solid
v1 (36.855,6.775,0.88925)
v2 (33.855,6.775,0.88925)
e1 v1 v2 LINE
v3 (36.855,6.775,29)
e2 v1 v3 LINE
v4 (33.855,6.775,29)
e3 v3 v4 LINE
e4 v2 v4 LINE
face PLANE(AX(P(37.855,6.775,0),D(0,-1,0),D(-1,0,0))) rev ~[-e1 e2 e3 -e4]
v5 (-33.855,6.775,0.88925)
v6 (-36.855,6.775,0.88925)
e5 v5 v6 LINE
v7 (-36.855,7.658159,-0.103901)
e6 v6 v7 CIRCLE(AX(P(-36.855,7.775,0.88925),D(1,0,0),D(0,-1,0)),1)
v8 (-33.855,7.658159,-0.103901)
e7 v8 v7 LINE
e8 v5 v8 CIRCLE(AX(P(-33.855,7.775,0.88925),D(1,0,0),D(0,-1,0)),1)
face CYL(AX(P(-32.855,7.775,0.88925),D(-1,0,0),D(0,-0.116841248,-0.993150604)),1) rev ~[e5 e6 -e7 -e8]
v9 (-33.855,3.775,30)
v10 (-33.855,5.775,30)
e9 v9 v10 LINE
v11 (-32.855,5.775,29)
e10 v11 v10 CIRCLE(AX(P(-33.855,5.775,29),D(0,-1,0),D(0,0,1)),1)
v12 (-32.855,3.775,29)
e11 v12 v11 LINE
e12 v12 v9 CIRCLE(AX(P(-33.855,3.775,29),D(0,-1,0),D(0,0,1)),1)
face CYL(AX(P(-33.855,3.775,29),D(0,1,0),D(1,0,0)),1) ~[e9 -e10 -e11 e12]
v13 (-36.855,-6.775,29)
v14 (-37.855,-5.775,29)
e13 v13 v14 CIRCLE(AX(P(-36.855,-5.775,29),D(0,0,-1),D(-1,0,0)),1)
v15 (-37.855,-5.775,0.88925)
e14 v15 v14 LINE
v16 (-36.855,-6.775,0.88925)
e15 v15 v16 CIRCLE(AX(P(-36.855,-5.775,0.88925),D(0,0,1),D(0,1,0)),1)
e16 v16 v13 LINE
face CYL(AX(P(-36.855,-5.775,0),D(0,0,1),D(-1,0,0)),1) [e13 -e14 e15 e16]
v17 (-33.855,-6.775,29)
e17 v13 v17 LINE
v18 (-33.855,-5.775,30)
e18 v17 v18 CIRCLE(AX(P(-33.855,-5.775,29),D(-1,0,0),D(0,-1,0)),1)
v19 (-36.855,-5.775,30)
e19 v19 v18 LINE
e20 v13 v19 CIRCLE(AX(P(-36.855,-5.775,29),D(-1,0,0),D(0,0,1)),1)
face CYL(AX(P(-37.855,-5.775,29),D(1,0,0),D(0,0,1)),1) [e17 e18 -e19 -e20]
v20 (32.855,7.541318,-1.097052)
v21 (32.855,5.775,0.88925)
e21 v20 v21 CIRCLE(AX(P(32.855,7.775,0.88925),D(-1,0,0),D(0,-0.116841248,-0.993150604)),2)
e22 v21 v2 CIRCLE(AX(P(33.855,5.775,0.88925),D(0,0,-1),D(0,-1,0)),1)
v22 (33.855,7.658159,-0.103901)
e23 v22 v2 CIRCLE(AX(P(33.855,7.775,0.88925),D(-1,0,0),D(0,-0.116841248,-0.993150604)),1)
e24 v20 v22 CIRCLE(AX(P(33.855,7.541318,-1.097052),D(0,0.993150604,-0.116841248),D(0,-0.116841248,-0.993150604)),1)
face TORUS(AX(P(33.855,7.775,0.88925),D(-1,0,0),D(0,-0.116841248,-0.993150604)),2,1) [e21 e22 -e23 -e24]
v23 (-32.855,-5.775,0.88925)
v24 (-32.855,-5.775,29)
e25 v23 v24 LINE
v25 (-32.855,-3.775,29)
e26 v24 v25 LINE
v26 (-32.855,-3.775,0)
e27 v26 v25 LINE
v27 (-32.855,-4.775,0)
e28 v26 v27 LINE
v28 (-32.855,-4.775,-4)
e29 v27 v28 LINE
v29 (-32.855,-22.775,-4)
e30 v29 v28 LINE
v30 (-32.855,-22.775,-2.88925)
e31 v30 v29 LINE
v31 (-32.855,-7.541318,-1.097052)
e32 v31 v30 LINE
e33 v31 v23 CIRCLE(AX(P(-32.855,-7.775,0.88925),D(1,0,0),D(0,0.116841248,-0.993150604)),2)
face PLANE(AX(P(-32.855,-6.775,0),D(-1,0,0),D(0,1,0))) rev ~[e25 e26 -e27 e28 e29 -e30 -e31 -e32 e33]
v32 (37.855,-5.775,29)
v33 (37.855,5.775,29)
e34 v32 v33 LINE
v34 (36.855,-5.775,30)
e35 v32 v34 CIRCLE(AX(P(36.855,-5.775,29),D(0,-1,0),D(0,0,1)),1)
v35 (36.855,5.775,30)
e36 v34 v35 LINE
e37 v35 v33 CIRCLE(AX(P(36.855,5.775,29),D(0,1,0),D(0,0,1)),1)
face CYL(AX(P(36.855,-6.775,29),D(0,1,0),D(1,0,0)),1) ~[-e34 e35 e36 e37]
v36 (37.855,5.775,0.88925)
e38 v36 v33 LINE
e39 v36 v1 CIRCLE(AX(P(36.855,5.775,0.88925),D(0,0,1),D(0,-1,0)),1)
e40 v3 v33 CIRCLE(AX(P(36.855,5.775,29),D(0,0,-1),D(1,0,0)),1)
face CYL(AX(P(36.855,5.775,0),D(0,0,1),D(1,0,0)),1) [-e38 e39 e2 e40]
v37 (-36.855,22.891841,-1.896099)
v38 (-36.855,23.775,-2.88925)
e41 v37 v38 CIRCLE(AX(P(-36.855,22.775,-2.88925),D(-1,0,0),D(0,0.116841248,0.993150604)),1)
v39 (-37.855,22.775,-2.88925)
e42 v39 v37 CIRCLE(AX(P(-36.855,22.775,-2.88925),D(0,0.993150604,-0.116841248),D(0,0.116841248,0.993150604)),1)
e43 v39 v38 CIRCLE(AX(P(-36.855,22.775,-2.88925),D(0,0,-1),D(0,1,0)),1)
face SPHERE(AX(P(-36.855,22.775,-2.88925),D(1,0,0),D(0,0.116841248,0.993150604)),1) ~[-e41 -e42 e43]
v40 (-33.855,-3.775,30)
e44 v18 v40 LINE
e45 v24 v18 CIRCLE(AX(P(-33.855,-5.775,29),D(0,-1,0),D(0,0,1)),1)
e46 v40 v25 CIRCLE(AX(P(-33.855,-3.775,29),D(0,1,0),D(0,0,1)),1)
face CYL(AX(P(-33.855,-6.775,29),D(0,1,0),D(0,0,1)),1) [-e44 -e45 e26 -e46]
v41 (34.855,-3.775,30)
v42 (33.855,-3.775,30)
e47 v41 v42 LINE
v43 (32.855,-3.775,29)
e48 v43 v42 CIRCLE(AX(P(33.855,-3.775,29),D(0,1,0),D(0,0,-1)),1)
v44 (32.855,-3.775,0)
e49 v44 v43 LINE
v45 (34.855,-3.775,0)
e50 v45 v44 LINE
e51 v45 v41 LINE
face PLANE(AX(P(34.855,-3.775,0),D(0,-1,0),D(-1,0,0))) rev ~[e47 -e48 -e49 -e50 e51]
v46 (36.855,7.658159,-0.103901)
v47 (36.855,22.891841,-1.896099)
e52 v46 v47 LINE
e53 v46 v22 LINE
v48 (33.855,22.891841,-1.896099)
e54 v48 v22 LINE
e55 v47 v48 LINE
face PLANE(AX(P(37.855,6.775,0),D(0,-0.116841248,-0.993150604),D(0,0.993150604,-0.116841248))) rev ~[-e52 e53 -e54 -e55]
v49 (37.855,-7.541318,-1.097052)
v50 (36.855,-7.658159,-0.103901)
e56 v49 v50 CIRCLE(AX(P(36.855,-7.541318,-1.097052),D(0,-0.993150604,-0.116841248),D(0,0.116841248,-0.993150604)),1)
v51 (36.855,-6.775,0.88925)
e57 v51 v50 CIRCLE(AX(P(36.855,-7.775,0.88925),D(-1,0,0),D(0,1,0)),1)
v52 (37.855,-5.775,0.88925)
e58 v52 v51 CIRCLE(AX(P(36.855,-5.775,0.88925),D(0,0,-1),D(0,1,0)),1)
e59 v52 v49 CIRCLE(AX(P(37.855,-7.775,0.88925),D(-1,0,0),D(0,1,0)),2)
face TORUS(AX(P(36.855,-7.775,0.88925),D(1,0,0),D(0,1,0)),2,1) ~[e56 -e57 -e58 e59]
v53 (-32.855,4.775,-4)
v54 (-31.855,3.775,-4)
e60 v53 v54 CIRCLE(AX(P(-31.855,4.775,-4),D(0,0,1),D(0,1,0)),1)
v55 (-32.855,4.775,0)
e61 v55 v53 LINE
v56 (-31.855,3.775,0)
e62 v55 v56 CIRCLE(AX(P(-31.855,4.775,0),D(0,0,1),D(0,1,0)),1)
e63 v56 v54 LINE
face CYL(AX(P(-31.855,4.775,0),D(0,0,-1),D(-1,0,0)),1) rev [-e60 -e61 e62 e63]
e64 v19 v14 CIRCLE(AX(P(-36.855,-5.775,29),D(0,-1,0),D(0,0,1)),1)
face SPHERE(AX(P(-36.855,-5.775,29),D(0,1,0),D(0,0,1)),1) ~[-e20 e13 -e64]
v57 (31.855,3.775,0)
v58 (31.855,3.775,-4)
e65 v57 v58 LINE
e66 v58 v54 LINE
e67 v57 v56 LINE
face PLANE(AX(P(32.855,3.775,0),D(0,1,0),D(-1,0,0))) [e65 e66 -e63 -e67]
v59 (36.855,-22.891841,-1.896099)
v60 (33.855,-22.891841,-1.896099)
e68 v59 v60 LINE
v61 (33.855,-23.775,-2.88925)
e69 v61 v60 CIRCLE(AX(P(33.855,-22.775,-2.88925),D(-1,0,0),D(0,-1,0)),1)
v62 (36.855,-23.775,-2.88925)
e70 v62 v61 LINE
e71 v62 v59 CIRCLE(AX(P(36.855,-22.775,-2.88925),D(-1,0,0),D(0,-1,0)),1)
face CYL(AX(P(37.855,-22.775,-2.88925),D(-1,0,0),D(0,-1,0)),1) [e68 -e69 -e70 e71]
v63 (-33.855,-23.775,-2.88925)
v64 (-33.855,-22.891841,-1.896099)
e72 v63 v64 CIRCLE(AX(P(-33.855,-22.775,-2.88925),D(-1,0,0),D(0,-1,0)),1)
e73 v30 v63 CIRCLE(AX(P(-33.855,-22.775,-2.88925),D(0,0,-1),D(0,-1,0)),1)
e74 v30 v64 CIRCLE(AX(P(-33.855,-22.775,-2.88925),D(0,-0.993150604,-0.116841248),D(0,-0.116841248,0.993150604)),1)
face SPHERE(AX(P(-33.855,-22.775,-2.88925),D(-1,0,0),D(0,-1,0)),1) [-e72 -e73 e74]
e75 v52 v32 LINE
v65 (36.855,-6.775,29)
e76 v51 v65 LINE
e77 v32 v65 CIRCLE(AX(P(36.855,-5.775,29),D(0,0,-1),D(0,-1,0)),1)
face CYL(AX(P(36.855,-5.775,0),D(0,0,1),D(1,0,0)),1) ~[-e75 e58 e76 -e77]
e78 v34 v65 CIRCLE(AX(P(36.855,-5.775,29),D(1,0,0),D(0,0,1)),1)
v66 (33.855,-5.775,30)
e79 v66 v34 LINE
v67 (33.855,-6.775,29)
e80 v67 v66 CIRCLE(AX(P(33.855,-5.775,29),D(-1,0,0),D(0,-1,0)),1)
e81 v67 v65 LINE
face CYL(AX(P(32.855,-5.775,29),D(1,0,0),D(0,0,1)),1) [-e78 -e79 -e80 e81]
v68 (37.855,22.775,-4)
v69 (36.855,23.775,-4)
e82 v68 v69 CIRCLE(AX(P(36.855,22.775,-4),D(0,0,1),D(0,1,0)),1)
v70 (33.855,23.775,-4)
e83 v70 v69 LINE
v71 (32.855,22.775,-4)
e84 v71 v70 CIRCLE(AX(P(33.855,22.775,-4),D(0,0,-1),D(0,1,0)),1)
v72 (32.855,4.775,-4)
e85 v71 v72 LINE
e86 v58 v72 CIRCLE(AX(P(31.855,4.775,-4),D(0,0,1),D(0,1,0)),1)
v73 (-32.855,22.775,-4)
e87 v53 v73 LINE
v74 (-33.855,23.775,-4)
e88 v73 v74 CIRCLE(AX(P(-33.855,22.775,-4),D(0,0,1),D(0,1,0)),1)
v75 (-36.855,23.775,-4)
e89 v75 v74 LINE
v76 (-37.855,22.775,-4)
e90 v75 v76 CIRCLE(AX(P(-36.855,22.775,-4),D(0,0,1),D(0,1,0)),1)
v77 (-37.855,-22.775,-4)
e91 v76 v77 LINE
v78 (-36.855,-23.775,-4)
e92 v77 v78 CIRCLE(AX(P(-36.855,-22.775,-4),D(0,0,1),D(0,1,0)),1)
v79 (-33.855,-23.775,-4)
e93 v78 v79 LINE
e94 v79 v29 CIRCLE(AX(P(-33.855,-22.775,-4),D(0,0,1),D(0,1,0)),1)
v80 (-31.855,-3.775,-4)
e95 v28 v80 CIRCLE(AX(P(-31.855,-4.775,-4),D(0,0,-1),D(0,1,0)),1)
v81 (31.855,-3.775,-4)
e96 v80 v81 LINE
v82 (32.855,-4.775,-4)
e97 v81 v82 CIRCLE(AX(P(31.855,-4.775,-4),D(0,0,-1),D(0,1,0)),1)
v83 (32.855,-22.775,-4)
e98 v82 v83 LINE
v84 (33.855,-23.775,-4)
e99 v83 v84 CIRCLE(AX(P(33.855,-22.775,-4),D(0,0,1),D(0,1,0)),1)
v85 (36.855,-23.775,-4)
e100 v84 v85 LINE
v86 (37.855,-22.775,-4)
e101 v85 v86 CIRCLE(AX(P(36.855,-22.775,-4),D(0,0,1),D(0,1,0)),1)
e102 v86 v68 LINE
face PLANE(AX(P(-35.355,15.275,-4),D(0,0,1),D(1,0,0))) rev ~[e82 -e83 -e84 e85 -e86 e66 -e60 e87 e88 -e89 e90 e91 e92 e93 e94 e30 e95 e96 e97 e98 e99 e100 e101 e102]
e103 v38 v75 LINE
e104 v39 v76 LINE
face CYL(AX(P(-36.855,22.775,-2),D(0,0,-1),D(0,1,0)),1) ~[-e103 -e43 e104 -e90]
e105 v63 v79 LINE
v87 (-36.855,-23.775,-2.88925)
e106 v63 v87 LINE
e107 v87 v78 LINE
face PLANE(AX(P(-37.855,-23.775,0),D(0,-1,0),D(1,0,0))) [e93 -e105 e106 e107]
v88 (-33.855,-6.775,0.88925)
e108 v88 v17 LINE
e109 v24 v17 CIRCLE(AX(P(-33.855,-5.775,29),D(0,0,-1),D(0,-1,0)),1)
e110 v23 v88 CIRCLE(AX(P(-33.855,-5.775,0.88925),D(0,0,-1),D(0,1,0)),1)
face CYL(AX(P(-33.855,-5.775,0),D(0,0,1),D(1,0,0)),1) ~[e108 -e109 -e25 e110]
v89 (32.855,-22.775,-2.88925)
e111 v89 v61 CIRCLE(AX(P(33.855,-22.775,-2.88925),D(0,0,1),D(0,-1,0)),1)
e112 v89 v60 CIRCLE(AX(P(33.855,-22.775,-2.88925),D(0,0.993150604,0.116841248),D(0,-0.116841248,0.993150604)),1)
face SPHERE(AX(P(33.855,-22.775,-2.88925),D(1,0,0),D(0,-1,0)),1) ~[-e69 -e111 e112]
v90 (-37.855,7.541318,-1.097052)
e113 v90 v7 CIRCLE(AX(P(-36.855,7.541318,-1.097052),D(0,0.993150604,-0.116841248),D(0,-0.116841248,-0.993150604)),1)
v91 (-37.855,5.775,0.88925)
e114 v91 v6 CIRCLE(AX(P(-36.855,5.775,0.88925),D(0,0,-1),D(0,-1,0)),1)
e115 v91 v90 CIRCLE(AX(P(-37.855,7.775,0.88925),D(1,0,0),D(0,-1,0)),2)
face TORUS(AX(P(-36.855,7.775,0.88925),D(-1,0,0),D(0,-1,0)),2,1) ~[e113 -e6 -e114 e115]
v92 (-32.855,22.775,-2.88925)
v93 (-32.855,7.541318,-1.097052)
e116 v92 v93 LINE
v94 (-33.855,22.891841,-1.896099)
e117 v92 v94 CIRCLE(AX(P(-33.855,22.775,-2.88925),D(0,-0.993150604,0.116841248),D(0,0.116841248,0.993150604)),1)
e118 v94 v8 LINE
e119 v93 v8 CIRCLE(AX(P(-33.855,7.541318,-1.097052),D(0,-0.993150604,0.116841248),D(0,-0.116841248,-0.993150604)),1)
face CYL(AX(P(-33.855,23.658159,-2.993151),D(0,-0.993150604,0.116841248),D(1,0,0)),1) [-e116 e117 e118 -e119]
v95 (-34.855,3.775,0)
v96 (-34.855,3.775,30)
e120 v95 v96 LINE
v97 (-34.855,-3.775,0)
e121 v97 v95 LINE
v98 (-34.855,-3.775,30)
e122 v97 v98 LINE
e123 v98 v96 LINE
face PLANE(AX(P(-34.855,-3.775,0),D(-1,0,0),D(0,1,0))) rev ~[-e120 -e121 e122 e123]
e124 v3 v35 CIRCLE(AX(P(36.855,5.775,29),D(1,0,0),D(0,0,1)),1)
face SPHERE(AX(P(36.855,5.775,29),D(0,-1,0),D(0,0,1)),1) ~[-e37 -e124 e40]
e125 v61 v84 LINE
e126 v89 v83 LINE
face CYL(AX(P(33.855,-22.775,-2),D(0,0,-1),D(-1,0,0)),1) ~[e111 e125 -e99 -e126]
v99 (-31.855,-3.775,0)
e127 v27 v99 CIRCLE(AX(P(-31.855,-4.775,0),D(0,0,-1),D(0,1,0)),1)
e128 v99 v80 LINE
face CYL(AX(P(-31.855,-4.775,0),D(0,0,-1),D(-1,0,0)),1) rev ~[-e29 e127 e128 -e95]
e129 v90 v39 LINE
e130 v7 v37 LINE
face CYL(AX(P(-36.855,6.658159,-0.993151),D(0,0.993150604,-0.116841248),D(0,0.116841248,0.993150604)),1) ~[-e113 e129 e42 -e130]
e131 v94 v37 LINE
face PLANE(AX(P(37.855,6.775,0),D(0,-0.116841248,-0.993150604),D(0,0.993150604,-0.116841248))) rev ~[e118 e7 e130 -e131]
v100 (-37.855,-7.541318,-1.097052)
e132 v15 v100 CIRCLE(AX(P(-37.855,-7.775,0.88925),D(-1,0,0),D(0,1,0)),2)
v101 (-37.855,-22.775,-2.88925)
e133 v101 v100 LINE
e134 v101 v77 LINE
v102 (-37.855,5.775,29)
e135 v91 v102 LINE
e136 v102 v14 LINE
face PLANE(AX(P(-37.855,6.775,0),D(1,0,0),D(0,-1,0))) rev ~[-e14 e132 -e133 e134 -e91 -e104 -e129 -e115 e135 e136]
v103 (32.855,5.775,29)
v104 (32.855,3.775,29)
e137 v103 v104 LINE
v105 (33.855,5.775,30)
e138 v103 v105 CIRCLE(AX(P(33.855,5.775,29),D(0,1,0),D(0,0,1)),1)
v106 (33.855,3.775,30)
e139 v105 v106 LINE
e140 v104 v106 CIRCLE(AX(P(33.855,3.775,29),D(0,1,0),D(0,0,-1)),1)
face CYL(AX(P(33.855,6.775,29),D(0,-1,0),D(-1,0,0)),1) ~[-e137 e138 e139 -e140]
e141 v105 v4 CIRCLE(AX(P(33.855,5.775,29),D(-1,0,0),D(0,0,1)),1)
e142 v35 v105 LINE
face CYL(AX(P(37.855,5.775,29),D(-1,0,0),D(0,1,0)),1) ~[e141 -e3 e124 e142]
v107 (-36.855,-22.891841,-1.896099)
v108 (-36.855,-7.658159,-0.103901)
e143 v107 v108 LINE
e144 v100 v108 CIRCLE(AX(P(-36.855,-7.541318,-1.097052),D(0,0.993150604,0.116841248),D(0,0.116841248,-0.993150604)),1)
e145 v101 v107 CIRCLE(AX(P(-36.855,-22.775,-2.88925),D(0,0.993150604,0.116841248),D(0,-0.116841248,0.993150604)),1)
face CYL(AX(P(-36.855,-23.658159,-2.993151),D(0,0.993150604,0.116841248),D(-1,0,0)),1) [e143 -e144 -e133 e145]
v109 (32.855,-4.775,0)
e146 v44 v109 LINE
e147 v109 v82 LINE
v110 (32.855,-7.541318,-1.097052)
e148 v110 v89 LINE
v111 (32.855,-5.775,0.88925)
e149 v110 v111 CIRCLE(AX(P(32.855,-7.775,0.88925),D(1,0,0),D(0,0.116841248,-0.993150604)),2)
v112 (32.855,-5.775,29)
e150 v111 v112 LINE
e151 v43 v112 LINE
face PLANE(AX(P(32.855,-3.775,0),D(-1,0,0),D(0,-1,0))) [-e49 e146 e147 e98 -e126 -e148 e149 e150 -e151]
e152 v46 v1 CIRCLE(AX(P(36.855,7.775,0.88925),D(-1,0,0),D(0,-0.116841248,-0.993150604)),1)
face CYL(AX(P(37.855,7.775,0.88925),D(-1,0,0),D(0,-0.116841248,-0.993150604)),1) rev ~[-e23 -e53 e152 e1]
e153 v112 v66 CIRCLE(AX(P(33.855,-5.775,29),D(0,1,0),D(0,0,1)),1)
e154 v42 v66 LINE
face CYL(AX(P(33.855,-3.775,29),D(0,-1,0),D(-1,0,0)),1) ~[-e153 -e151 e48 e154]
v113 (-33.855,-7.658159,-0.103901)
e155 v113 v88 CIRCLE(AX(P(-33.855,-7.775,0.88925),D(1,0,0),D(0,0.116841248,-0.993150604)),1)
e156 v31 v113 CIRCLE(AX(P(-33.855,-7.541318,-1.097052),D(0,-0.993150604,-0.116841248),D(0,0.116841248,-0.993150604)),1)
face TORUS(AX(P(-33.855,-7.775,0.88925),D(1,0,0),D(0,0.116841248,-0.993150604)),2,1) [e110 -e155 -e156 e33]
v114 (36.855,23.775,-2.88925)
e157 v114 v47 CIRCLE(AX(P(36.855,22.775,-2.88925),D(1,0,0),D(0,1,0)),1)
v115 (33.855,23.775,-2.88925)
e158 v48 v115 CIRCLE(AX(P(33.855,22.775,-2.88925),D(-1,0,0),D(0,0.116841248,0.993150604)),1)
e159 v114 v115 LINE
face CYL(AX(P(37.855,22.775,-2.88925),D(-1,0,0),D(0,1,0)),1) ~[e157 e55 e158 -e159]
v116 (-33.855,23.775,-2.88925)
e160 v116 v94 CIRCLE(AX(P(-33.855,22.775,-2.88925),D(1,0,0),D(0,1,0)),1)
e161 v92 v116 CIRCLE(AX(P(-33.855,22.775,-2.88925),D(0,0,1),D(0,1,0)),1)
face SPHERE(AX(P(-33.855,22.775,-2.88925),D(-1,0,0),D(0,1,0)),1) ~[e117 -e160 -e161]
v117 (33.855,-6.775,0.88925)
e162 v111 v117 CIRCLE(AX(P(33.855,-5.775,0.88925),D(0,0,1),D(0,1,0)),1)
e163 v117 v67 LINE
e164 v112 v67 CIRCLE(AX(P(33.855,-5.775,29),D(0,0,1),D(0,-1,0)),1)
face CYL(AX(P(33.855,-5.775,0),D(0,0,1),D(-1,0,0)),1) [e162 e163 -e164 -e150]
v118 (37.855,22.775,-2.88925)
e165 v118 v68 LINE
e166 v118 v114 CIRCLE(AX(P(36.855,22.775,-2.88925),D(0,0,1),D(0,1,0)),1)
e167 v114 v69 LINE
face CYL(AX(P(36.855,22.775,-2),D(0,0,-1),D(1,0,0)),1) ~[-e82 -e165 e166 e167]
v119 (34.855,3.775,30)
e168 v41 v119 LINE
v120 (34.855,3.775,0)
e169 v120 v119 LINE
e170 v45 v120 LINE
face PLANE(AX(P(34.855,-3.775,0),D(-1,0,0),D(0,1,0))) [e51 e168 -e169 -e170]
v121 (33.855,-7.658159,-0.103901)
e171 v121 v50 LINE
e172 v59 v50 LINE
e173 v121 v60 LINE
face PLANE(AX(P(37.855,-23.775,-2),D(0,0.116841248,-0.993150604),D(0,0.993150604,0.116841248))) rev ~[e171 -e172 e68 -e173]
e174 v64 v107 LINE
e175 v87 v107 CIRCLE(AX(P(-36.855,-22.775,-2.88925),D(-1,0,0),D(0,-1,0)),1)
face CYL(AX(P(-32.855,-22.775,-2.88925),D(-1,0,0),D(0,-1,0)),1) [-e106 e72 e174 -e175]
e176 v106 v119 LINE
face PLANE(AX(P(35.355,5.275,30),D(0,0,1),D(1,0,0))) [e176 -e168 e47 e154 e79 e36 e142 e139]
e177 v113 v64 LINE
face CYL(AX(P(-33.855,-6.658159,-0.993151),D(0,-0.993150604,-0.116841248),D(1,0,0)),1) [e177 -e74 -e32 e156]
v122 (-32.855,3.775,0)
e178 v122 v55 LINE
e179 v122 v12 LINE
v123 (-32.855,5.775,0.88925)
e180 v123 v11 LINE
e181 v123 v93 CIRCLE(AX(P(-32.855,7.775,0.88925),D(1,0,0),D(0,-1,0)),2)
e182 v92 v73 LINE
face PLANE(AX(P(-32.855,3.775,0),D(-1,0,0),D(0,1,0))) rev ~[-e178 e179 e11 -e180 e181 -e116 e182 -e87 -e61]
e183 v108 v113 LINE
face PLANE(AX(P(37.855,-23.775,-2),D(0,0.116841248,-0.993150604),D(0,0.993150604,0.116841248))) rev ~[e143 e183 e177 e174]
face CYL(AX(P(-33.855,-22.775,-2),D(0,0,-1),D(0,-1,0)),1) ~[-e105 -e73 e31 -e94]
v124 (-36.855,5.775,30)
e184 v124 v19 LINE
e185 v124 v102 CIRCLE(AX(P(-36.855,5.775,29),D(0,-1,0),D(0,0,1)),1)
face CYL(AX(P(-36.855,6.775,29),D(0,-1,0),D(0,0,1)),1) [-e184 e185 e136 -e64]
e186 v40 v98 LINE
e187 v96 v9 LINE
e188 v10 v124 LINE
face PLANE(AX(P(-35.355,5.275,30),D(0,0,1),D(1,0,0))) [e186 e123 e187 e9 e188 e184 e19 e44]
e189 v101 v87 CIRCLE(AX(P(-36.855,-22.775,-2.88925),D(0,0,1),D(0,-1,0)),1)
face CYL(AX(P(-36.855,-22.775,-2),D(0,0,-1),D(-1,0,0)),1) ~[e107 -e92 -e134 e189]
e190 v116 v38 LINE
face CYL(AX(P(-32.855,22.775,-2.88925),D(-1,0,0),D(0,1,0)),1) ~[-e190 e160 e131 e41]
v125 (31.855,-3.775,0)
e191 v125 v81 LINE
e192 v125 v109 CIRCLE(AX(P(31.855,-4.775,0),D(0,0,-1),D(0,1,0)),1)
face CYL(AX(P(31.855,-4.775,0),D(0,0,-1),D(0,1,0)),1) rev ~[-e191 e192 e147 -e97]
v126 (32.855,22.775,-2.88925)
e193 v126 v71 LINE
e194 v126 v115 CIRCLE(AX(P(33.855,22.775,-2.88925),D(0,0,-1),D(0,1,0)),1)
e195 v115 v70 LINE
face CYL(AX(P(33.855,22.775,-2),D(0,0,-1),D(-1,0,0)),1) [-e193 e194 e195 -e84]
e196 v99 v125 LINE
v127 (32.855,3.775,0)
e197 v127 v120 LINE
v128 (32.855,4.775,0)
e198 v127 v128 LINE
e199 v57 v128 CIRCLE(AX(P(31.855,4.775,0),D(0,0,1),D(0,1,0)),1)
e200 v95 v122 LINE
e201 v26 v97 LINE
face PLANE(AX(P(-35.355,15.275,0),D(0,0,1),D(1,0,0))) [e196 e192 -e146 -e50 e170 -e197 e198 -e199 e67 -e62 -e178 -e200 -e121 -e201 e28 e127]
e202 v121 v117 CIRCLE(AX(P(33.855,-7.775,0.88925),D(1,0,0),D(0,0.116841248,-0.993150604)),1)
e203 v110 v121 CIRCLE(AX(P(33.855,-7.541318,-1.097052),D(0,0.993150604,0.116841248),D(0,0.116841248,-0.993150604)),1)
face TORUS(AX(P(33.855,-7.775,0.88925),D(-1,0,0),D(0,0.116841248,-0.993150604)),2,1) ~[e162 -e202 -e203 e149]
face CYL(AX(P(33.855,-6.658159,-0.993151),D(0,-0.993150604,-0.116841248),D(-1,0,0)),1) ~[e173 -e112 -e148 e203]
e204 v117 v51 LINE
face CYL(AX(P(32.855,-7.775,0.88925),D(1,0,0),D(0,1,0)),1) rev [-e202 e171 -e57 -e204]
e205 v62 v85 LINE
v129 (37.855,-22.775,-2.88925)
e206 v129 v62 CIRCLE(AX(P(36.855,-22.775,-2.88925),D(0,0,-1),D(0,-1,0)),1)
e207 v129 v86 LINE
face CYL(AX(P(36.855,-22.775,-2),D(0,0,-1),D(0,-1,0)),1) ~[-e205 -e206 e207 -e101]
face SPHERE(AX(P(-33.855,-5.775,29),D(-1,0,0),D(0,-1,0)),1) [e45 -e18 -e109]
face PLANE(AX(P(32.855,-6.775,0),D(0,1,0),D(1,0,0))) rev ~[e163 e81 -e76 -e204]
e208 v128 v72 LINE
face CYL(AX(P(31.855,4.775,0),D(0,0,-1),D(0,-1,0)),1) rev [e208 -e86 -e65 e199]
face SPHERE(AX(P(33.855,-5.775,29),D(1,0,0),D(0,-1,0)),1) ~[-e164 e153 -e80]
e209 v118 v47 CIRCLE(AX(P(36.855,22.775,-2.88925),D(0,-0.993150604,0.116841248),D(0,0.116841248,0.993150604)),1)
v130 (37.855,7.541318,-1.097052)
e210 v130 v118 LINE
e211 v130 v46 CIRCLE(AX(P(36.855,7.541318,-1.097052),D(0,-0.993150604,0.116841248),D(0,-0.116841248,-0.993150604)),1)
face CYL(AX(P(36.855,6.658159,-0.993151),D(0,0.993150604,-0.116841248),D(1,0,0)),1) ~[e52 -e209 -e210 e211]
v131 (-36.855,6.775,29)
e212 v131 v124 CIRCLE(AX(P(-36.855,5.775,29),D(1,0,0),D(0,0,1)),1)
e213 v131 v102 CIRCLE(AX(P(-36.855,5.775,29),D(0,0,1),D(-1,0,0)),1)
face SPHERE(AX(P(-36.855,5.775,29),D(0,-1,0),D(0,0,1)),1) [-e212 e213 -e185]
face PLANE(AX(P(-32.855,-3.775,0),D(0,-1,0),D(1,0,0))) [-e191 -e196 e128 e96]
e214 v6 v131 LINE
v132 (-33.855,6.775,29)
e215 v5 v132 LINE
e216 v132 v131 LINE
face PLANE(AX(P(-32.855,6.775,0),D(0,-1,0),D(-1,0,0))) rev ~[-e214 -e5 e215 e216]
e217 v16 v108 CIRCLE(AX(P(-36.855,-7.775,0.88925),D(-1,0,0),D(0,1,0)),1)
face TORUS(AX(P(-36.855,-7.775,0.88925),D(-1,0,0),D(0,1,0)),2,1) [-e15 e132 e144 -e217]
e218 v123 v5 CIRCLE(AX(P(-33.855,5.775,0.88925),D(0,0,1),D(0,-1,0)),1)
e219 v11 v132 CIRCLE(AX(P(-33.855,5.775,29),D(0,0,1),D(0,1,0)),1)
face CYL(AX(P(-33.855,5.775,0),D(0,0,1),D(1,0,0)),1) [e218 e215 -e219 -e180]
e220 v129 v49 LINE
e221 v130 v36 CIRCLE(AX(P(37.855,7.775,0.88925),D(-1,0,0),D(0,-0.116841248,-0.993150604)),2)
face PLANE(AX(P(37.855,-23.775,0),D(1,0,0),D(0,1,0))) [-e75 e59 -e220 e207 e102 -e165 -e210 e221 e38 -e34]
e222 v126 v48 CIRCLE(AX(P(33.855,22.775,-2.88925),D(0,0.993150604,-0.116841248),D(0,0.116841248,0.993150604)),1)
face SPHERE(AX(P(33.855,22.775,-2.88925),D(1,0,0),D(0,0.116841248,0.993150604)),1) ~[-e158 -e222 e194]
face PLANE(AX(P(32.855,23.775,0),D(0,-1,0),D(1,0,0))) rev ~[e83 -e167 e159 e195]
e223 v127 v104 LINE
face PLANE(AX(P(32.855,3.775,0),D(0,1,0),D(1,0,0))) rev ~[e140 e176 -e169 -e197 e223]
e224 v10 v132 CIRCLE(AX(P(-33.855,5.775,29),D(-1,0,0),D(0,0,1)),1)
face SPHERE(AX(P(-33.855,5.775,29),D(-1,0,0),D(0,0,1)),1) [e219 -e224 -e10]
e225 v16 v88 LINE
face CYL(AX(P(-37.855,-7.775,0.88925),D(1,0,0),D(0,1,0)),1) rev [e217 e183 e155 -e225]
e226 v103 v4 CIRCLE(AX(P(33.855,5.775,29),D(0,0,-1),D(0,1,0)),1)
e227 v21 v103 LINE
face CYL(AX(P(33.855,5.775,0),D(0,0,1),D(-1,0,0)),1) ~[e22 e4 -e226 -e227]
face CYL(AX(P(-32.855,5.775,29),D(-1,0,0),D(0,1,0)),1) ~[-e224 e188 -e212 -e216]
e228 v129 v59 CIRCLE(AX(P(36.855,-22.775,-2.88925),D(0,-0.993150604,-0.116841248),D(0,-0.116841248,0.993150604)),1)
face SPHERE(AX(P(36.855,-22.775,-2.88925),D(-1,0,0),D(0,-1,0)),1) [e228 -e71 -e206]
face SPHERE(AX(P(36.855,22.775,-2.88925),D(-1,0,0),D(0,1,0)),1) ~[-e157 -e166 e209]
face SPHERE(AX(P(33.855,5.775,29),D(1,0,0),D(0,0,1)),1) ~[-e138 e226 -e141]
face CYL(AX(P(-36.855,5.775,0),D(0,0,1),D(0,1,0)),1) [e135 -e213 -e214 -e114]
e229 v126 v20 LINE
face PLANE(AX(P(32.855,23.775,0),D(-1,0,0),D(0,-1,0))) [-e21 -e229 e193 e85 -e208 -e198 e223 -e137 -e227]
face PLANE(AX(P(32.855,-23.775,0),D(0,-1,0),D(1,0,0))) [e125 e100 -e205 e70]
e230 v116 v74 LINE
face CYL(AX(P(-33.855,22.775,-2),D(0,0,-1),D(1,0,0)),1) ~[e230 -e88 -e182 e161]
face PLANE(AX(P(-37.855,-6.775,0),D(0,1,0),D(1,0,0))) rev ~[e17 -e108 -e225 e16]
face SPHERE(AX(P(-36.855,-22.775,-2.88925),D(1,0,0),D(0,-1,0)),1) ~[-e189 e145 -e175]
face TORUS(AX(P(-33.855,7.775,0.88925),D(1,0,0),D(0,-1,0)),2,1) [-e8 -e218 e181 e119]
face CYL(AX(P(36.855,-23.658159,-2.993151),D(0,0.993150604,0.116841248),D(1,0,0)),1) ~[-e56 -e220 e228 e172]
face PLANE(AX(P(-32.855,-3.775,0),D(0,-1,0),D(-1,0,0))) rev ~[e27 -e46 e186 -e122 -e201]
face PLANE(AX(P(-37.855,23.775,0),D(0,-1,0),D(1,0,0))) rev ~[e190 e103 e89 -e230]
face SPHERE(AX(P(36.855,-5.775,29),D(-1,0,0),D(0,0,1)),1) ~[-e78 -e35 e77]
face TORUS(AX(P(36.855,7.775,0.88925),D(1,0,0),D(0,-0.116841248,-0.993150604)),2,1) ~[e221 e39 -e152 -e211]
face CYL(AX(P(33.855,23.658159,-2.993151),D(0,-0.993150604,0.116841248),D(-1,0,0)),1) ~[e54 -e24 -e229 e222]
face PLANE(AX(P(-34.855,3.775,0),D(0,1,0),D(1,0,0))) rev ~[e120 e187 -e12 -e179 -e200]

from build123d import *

# Parameters (mm, degrees)
F0_W     = 5
F0_H     = 17
F0_W_2   = 3
F0_H_2   = 7.55
F1_DEPTH = 4
F2_DEPTH = 30
F4_DEPTH = 75.711
F5_R     = 1


with BuildPart() as f1:
    # F0 (on Top) → F1 (new body)
    with BuildSketch(Plane.XY):
        with Locations((-35.355, 15.275)):
            Rectangle(F0_W, F0_H)
        Polygon((-34.855, 3.775), (-32.855, 3.775), (-32.855, 6.775), (-37.855, 6.775), (-37.855, 3.775), align=None)
        with Locations((-35.355, -15.275)):
            Rectangle(F0_W, F0_H)
        Polygon((37.855, -3.775), (34.855, -3.775), (32.855, -3.775), (32.855, -6.775), (37.855, -6.775), align=None)
        with Locations((35.355, 15.275)):
            Rectangle(F0_W, F0_H)
        with Locations((-36.355, 0)):
            Rectangle(F0_W_2, F0_H_2)
        Polygon((-32.855, -6.775), (-32.855, -3.775), (-34.855, -3.775), (-37.855, -3.775), (-37.855, -6.775), align=None)
        Polygon((32.855, -3.775), (34.855, -3.775), (34.855, 3.775), (32.855, 3.775), (-32.855, 3.775), (-34.855, 3.775), (-34.855, -3.775), (-32.855, -3.775), align=None)
        with Locations((36.355, 0)):
            Rectangle(F0_W_2, F0_H_2)
        Polygon((32.855, 3.775), (34.855, 3.775), (37.855, 3.775), (37.855, 6.775), (32.855, 6.775), align=None)
        with Locations((35.355, -15.275)):
            Rectangle(F0_W, F0_H)
    extrude(amount=-F1_DEPTH)

    # F0 (on Top) → F2 (join)
    with BuildSketch(Plane.XY):
        Polygon((-34.855, 3.775), (-32.855, 3.775), (-32.855, 6.775), (-37.855, 6.775), (-37.855, 3.775), align=None)
        with Locations((-36.355, 0)):
            Rectangle(F0_W_2, F0_H_2)
        Polygon((-32.855, -6.775), (-32.855, -3.775), (-34.855, -3.775), (-37.855, -3.775), (-37.855, -6.775), align=None)
        Polygon((32.855, 3.775), (34.855, 3.775), (37.855, 3.775), (37.855, 6.775), (32.855, 6.775), align=None)
        with Locations((36.355, 0)):
            Rectangle(F0_W_2, F0_H_2)
        Polygon((37.855, -3.775), (34.855, -3.775), (32.855, -3.775), (32.855, -6.775), (37.855, -6.775), align=None)
    extrude(amount=F2_DEPTH)

    # F3 (on face) → F4 (cut, through all)
    with BuildSketch(Plane.YZ.offset(37.855)):
        Polygon((-23.775, -2), (-6.775, 0), (-23.775, 0), align=None)
        Polygon((23.775, 0), (6.775, 0), (23.775, -2), align=None)
    extrude(amount=-F4_DEPTH, mode=Mode.SUBTRACT)

    # F5
    f5_edges = [f1.edges().sort_by_distance(p)[0] for p in [
        (-37.855, 0, 30),
        (-35.355, -6.775, 30),
        (-37.855, -6.775, 15),
        (35.355, -6.775, 30),
        (37.855, 0, 30),
        (37.855, -6.775, 15),
        (37.855, -15.275, -1),
        (35.355, -23.775, -2),
        (37.855, -23.775, -3),
        (32.855, -23.775, -3),
        (32.855, -15.275, -1),
        (32.855, -6.775, 15),
        (-35.355, -23.775, -2),
        (-37.855, -23.775, -3),
        (-32.855, -23.775, -3),
        (-37.855, -15.275, -1),
        (-32.855, -15.275, -1),
        (-32.855, -6.775, 15),
        (-32.855, -5.275, 30),
        (32.855, -5.275, 30),
        (35.355, 6.775, 30),
        (37.855, 6.775, 15),
        (35.355, -6.775, 0),
        (-35.355, -6.775, 0),
        (35.355, 6.775, 0),
        (37.855, 15.275, -1),
        (35.355, 23.775, -2),
        (32.855, 15.275, -1),
        (37.855, 23.775, -3),
        (32.855, 23.775, -3),
        (-32.855, 15.275, -1),
        (-35.355, 23.775, -2),
        (-37.855, 15.275, -1),
        (-35.355, 6.775, 0),
        (-35.355, 6.775, 30),
        (-32.855, 5.275, 30),
        (-32.855, 23.775, -3),
        (-37.855, 23.775, -3),
        (-32.855, -3.775, -2),
        (32.855, -3.775, -2),
        (-32.855, 3.775, -2),
        (32.855, 3.775, -2),
        (32.855, 5.275, 30),
        (-37.855, 6.775, 15),
        (-32.855, 6.775, 15),
        (32.855, 6.775, 15),
    ]]
    fillet(f5_edges, radius=F5_R)


solid = f1.part
